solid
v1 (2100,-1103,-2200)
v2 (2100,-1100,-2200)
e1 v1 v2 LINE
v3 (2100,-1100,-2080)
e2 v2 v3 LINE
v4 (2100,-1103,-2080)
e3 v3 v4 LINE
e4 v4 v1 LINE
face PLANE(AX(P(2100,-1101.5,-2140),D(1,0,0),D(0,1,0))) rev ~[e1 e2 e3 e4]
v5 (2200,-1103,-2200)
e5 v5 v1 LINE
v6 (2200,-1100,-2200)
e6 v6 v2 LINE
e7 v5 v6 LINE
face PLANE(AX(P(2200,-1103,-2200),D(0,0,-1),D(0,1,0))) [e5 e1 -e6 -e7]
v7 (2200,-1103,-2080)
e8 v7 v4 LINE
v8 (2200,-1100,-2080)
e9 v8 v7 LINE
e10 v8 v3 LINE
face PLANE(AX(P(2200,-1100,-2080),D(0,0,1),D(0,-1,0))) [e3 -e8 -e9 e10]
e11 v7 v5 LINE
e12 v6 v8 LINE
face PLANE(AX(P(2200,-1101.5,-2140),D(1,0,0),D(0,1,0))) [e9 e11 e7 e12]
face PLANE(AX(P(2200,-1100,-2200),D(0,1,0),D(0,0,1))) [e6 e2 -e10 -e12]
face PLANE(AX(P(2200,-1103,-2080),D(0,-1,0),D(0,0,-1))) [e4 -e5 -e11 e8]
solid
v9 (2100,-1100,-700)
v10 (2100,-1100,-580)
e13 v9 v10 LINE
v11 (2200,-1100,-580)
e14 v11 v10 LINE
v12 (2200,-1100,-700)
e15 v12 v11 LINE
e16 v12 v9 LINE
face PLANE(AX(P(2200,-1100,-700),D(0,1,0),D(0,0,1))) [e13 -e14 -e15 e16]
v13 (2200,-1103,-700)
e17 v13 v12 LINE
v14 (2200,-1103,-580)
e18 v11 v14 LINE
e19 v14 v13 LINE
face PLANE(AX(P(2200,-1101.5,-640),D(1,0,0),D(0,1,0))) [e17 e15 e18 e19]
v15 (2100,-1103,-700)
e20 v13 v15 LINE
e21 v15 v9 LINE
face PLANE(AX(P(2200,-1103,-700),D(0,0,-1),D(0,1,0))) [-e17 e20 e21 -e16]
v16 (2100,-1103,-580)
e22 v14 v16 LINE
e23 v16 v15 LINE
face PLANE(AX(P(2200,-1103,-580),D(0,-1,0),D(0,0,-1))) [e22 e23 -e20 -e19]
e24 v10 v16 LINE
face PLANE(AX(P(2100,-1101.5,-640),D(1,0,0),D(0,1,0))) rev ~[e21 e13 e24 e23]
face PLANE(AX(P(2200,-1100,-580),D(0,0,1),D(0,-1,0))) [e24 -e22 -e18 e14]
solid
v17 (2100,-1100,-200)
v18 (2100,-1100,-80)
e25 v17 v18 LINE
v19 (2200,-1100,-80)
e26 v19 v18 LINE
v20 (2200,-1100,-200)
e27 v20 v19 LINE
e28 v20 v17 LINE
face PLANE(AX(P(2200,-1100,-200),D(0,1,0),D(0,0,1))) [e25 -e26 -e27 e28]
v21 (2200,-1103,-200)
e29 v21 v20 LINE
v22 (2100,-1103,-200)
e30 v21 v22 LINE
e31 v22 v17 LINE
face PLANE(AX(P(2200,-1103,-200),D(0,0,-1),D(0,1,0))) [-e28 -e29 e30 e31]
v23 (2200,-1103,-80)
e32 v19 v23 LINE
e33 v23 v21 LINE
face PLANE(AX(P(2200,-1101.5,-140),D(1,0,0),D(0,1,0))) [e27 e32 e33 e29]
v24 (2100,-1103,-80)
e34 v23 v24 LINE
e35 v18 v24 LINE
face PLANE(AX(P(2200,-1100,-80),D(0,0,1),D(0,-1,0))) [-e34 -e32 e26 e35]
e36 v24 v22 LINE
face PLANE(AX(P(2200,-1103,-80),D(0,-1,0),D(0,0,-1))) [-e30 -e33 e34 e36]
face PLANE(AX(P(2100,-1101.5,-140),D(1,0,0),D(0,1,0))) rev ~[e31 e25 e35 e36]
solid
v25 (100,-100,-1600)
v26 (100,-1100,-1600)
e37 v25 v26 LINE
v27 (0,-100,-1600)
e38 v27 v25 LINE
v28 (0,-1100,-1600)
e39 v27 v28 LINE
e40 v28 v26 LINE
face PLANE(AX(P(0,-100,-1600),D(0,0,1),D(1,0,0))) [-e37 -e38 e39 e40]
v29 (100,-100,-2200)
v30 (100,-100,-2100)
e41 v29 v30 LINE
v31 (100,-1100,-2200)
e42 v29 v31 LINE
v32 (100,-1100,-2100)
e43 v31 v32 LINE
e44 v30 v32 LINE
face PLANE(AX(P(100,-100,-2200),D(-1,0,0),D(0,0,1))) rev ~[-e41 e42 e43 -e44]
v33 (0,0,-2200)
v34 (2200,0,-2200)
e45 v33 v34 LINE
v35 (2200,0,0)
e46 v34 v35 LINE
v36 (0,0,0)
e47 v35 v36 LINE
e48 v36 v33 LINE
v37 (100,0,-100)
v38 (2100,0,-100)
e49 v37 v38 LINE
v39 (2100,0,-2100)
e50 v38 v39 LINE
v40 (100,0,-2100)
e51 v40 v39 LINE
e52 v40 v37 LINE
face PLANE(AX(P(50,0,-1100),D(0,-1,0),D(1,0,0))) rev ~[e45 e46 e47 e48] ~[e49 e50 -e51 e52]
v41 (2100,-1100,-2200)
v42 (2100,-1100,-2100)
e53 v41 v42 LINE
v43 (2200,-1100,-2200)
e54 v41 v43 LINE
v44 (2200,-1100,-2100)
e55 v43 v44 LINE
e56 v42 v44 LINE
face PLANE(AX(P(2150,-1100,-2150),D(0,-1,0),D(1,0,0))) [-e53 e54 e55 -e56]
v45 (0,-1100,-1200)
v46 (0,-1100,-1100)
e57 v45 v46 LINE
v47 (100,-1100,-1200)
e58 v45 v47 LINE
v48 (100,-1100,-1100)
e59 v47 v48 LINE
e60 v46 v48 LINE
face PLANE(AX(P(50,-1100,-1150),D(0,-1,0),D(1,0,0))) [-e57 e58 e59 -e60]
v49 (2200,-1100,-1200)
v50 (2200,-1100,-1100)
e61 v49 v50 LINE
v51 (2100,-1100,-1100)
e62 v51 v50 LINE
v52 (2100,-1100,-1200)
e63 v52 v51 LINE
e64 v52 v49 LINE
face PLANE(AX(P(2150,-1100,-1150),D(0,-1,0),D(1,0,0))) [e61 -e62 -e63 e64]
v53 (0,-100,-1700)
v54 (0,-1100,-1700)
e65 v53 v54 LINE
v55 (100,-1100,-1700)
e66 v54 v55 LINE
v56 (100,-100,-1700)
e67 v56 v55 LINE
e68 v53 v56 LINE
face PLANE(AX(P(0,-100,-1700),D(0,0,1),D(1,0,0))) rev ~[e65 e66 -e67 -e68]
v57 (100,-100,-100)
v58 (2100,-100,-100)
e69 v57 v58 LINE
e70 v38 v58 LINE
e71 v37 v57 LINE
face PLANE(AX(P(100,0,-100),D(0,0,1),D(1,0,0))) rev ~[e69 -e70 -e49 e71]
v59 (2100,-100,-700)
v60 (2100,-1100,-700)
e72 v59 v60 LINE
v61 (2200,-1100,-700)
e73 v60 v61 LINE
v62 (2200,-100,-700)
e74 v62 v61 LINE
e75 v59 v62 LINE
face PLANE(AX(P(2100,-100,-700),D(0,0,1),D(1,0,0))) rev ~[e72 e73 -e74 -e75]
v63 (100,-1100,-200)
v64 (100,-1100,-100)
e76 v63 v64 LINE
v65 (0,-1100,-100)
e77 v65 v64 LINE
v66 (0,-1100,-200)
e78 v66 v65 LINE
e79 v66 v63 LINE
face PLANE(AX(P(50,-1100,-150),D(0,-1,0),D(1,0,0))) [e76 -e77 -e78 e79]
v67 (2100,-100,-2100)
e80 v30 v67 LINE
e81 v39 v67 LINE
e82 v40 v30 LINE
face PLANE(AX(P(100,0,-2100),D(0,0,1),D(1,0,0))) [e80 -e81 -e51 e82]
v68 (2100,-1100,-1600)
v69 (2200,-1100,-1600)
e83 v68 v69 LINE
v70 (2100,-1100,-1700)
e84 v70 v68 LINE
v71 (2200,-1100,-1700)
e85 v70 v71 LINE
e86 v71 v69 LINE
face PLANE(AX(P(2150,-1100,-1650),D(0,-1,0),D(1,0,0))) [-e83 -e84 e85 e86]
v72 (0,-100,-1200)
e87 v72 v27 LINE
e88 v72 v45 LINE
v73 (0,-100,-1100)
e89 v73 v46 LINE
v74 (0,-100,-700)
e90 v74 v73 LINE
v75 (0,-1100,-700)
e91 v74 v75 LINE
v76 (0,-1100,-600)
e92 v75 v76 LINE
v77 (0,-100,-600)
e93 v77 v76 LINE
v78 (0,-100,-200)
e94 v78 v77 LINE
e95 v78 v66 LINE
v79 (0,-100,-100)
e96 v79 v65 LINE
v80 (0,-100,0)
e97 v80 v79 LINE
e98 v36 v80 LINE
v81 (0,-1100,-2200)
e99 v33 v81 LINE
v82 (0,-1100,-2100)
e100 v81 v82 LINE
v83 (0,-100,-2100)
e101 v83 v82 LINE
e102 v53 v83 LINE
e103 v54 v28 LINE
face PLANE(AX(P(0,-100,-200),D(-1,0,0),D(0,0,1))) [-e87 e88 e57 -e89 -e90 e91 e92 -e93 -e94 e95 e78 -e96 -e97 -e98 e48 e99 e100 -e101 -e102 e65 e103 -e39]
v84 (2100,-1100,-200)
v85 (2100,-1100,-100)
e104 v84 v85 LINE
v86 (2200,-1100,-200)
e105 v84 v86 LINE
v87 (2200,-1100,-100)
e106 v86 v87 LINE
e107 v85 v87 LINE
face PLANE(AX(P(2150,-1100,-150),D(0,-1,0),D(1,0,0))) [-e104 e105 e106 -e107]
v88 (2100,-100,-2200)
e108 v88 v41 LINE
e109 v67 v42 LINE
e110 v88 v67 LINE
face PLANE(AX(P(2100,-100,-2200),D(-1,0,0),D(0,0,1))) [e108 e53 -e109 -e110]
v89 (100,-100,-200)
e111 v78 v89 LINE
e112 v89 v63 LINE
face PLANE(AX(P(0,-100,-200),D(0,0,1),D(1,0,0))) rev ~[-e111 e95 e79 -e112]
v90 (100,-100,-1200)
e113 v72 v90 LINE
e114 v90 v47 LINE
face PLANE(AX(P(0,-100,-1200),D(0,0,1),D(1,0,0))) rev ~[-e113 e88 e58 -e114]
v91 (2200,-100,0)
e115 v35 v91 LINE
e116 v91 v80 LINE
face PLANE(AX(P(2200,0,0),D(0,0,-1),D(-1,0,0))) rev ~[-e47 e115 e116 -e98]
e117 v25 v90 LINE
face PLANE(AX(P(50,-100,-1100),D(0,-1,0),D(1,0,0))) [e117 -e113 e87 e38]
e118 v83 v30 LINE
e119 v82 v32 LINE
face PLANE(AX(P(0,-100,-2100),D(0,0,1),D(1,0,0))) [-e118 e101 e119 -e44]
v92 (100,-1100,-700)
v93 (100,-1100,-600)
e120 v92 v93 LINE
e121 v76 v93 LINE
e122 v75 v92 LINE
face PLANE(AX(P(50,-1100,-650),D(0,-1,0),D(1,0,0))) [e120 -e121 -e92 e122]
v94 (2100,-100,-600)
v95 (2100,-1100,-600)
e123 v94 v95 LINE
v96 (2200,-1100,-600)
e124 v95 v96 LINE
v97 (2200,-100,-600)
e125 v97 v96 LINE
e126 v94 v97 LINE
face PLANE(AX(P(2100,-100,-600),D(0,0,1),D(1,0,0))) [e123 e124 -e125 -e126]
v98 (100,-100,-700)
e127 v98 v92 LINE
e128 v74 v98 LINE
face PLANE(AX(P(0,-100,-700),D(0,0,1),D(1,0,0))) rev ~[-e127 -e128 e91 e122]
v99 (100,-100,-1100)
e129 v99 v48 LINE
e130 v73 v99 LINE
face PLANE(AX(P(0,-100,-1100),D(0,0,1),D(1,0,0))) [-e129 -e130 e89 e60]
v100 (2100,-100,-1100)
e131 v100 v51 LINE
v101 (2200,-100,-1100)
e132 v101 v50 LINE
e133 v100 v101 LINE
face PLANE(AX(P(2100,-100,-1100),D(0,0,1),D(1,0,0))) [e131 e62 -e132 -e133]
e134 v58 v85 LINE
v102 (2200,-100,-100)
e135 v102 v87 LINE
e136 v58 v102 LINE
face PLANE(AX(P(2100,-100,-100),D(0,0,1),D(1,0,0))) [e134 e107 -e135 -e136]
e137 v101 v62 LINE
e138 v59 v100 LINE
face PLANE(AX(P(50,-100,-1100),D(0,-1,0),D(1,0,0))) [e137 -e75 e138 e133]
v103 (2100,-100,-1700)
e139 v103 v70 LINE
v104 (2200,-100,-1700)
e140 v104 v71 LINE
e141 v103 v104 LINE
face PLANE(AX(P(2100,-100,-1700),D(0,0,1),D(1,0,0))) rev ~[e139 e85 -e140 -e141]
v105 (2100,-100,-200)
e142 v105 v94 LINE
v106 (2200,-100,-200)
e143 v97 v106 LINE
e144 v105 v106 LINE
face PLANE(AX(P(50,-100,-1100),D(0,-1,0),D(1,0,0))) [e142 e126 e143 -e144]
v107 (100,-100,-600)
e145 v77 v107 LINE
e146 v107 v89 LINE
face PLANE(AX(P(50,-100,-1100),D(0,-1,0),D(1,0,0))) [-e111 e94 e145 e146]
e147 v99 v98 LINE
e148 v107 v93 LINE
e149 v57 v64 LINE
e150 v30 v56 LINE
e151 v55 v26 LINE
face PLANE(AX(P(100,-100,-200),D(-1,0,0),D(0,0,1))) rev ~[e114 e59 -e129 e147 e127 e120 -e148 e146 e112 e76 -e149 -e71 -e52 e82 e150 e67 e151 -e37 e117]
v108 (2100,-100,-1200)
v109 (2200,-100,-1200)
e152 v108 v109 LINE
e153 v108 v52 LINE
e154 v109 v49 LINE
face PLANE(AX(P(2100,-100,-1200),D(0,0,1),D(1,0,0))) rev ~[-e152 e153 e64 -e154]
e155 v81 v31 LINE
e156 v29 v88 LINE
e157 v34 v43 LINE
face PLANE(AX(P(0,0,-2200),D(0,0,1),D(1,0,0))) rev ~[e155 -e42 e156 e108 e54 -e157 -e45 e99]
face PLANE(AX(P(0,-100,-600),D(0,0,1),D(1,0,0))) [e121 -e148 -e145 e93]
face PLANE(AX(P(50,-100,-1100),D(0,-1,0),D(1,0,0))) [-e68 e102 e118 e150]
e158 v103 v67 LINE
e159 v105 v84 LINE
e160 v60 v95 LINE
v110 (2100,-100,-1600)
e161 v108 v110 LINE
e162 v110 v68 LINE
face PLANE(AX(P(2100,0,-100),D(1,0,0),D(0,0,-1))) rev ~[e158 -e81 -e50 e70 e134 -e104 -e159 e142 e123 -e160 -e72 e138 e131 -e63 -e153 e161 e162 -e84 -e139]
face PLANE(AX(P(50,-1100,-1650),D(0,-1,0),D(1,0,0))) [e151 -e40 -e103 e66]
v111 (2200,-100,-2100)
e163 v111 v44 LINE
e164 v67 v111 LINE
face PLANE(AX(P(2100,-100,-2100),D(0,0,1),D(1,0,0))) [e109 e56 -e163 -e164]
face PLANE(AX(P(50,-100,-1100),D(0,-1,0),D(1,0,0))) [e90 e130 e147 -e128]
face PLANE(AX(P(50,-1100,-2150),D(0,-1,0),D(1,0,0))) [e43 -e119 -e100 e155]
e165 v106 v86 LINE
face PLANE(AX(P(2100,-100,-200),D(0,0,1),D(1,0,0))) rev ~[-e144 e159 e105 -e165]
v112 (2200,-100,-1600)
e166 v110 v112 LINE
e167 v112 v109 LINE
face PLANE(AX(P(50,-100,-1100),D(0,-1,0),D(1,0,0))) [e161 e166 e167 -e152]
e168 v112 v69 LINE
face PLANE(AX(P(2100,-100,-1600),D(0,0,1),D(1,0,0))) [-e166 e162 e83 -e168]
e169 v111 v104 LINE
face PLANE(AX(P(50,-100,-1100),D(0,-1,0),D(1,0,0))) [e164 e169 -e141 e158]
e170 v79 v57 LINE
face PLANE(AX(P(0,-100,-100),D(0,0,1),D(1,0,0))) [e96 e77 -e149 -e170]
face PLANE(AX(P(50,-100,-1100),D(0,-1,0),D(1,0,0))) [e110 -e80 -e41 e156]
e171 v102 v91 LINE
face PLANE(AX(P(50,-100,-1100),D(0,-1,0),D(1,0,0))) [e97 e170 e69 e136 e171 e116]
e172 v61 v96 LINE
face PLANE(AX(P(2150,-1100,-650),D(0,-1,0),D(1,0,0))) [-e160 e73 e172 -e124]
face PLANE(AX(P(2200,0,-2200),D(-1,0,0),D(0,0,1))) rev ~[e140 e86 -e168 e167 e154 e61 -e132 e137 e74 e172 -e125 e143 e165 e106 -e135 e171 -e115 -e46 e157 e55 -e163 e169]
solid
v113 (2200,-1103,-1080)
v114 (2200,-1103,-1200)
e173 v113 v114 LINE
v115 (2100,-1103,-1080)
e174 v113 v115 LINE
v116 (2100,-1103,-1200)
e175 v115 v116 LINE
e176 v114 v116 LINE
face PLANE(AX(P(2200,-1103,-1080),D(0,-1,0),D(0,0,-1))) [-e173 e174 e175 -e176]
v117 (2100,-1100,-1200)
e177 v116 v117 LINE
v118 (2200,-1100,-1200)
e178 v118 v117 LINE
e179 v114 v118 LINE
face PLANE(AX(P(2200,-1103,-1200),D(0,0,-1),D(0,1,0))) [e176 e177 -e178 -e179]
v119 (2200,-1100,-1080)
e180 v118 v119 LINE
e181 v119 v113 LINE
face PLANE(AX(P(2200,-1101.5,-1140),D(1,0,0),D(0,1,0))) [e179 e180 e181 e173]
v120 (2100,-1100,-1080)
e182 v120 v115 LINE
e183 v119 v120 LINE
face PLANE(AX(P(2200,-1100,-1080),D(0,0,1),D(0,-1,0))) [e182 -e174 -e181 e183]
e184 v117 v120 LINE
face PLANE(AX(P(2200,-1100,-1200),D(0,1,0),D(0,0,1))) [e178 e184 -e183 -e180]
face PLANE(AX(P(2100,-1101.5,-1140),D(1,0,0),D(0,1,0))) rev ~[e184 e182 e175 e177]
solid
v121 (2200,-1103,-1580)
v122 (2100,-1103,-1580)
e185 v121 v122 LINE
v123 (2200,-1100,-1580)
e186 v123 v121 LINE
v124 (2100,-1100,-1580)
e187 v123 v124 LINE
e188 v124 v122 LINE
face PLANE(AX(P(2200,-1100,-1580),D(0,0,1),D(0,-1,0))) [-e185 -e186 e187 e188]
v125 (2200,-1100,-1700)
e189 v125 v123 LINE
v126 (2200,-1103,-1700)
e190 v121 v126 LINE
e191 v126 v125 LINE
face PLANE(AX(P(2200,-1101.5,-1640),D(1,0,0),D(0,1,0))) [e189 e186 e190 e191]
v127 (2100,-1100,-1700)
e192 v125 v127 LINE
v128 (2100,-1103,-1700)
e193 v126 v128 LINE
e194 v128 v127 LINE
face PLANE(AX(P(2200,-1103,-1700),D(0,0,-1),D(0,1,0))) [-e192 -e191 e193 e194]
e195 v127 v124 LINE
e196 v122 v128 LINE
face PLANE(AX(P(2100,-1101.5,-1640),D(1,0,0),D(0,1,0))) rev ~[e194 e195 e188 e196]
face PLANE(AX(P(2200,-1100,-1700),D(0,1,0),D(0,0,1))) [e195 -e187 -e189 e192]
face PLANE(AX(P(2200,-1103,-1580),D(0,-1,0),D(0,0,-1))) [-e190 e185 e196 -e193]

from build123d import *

# Parameters (mm, degrees)
F0_W     = 2000
F0_H     = 100
F1_DEPTH = 100
F2_W     = 100
F2_H     = 100
F3_DEPTH = 1000
F5_DEPTH = 100


# Not quite as in the source:
# - the program builds the solid bodies; features that only make, move or delete a surface that nothing else refers to are left out


with BuildPart() as f1:
    # F0 (on Front) → F1 (new body)
    with BuildSketch(Plane.XZ):
        Polygon((100, 0), (0, 0), (0, -2200), (100, -2200), (100, -2100), (100, -100), align=None)
        with Locations((1100, -2150)):
            Rectangle(F0_W, F0_H)
        Polygon((2200, 0), (2100, 0), (2100, -100), (2100, -2100), (2100, -2200), (2200, -2200), align=None)
        with Locations((1100, -50)):
            Rectangle(F0_W, F0_H)
    extrude(amount=F1_DEPTH)

    # F2 (on face) → F3 (join)
    with BuildSketch(Plane.XZ.offset(100)):
        with Locations((50, -150)):
            Rectangle(F2_W, F2_H)
        with Locations((50, -650)):
            Rectangle(F2_W, F2_H)
        with Locations((50, -1150)):
            Rectangle(F2_W, F2_H)
        with Locations((50, -1650)):
            Rectangle(F2_W, F2_H)
        with Locations((50, -2150)):
            Rectangle(F2_W, F2_H)
        with Locations((2150, -2150)):
            Rectangle(F2_W, F2_H)
        with Locations((2150, -1650)):
            Rectangle(F2_W, F2_H)
        with Locations((2150, -1150)):
            Rectangle(F2_W, F2_H)
        with Locations((2150, -650)):
            Rectangle(F2_W, F2_H)
        with Locations((2150, -150)):
            Rectangle(F2_W, F2_H)
    extrude(amount=F3_DEPTH)


with BuildPart() as f5:
    # F4 (on face) → F5 (new body)
    with BuildSketch(Plane.YZ.offset(2200)):
        Polygon((-1103, -2200), (-1100, -2200), (-1100, -2100), (-1100, -2080), (-1103, -2080), align=None)
    extrude(amount=-F5_DEPTH)


with BuildPart() as f5b:
    # F4 (on face) → F5, piece 2 (new body)
    with BuildSketch(Plane.YZ.offset(2200)):
        Polygon((-1103, -1700), (-1100, -1700), (-1100, -1600), (-1100, -1580), (-1103, -1580), align=None)
    extrude(amount=-F5_DEPTH)


with BuildPart() as f5c:
    # F4 (on face) → F5, piece 3 (new body)
    with BuildSketch(Plane.YZ.offset(2200)):
        Polygon((-1100, -1200), (-1100, -1100), (-1100, -1080), (-1103, -1080), (-1103, -1200), align=None)
    extrude(amount=-F5_DEPTH)


with BuildPart() as f5d:
    # F4 (on face) → F5, piece 4 (new body)
    with BuildSketch(Plane.YZ.offset(2200)):
        Polygon((-1100, -700), (-1100, -600), (-1100, -580), (-1103, -580), (-1103, -700), align=None)
    extrude(amount=-F5_DEPTH)


with BuildPart() as f5e:
    # F4 (on face) → F5, piece 5 (new body)
    with BuildSketch(Plane.YZ.offset(2200)):
        Polygon((-1103, -200), (-1100, -200), (-1100, -100), (-1100, -80), (-1103, -80), align=None)
    extrude(amount=-F5_DEPTH)


solid = Compound([f1.part, f5.part, f5b.part, f5c.part, f5d.part, f5e.part])
